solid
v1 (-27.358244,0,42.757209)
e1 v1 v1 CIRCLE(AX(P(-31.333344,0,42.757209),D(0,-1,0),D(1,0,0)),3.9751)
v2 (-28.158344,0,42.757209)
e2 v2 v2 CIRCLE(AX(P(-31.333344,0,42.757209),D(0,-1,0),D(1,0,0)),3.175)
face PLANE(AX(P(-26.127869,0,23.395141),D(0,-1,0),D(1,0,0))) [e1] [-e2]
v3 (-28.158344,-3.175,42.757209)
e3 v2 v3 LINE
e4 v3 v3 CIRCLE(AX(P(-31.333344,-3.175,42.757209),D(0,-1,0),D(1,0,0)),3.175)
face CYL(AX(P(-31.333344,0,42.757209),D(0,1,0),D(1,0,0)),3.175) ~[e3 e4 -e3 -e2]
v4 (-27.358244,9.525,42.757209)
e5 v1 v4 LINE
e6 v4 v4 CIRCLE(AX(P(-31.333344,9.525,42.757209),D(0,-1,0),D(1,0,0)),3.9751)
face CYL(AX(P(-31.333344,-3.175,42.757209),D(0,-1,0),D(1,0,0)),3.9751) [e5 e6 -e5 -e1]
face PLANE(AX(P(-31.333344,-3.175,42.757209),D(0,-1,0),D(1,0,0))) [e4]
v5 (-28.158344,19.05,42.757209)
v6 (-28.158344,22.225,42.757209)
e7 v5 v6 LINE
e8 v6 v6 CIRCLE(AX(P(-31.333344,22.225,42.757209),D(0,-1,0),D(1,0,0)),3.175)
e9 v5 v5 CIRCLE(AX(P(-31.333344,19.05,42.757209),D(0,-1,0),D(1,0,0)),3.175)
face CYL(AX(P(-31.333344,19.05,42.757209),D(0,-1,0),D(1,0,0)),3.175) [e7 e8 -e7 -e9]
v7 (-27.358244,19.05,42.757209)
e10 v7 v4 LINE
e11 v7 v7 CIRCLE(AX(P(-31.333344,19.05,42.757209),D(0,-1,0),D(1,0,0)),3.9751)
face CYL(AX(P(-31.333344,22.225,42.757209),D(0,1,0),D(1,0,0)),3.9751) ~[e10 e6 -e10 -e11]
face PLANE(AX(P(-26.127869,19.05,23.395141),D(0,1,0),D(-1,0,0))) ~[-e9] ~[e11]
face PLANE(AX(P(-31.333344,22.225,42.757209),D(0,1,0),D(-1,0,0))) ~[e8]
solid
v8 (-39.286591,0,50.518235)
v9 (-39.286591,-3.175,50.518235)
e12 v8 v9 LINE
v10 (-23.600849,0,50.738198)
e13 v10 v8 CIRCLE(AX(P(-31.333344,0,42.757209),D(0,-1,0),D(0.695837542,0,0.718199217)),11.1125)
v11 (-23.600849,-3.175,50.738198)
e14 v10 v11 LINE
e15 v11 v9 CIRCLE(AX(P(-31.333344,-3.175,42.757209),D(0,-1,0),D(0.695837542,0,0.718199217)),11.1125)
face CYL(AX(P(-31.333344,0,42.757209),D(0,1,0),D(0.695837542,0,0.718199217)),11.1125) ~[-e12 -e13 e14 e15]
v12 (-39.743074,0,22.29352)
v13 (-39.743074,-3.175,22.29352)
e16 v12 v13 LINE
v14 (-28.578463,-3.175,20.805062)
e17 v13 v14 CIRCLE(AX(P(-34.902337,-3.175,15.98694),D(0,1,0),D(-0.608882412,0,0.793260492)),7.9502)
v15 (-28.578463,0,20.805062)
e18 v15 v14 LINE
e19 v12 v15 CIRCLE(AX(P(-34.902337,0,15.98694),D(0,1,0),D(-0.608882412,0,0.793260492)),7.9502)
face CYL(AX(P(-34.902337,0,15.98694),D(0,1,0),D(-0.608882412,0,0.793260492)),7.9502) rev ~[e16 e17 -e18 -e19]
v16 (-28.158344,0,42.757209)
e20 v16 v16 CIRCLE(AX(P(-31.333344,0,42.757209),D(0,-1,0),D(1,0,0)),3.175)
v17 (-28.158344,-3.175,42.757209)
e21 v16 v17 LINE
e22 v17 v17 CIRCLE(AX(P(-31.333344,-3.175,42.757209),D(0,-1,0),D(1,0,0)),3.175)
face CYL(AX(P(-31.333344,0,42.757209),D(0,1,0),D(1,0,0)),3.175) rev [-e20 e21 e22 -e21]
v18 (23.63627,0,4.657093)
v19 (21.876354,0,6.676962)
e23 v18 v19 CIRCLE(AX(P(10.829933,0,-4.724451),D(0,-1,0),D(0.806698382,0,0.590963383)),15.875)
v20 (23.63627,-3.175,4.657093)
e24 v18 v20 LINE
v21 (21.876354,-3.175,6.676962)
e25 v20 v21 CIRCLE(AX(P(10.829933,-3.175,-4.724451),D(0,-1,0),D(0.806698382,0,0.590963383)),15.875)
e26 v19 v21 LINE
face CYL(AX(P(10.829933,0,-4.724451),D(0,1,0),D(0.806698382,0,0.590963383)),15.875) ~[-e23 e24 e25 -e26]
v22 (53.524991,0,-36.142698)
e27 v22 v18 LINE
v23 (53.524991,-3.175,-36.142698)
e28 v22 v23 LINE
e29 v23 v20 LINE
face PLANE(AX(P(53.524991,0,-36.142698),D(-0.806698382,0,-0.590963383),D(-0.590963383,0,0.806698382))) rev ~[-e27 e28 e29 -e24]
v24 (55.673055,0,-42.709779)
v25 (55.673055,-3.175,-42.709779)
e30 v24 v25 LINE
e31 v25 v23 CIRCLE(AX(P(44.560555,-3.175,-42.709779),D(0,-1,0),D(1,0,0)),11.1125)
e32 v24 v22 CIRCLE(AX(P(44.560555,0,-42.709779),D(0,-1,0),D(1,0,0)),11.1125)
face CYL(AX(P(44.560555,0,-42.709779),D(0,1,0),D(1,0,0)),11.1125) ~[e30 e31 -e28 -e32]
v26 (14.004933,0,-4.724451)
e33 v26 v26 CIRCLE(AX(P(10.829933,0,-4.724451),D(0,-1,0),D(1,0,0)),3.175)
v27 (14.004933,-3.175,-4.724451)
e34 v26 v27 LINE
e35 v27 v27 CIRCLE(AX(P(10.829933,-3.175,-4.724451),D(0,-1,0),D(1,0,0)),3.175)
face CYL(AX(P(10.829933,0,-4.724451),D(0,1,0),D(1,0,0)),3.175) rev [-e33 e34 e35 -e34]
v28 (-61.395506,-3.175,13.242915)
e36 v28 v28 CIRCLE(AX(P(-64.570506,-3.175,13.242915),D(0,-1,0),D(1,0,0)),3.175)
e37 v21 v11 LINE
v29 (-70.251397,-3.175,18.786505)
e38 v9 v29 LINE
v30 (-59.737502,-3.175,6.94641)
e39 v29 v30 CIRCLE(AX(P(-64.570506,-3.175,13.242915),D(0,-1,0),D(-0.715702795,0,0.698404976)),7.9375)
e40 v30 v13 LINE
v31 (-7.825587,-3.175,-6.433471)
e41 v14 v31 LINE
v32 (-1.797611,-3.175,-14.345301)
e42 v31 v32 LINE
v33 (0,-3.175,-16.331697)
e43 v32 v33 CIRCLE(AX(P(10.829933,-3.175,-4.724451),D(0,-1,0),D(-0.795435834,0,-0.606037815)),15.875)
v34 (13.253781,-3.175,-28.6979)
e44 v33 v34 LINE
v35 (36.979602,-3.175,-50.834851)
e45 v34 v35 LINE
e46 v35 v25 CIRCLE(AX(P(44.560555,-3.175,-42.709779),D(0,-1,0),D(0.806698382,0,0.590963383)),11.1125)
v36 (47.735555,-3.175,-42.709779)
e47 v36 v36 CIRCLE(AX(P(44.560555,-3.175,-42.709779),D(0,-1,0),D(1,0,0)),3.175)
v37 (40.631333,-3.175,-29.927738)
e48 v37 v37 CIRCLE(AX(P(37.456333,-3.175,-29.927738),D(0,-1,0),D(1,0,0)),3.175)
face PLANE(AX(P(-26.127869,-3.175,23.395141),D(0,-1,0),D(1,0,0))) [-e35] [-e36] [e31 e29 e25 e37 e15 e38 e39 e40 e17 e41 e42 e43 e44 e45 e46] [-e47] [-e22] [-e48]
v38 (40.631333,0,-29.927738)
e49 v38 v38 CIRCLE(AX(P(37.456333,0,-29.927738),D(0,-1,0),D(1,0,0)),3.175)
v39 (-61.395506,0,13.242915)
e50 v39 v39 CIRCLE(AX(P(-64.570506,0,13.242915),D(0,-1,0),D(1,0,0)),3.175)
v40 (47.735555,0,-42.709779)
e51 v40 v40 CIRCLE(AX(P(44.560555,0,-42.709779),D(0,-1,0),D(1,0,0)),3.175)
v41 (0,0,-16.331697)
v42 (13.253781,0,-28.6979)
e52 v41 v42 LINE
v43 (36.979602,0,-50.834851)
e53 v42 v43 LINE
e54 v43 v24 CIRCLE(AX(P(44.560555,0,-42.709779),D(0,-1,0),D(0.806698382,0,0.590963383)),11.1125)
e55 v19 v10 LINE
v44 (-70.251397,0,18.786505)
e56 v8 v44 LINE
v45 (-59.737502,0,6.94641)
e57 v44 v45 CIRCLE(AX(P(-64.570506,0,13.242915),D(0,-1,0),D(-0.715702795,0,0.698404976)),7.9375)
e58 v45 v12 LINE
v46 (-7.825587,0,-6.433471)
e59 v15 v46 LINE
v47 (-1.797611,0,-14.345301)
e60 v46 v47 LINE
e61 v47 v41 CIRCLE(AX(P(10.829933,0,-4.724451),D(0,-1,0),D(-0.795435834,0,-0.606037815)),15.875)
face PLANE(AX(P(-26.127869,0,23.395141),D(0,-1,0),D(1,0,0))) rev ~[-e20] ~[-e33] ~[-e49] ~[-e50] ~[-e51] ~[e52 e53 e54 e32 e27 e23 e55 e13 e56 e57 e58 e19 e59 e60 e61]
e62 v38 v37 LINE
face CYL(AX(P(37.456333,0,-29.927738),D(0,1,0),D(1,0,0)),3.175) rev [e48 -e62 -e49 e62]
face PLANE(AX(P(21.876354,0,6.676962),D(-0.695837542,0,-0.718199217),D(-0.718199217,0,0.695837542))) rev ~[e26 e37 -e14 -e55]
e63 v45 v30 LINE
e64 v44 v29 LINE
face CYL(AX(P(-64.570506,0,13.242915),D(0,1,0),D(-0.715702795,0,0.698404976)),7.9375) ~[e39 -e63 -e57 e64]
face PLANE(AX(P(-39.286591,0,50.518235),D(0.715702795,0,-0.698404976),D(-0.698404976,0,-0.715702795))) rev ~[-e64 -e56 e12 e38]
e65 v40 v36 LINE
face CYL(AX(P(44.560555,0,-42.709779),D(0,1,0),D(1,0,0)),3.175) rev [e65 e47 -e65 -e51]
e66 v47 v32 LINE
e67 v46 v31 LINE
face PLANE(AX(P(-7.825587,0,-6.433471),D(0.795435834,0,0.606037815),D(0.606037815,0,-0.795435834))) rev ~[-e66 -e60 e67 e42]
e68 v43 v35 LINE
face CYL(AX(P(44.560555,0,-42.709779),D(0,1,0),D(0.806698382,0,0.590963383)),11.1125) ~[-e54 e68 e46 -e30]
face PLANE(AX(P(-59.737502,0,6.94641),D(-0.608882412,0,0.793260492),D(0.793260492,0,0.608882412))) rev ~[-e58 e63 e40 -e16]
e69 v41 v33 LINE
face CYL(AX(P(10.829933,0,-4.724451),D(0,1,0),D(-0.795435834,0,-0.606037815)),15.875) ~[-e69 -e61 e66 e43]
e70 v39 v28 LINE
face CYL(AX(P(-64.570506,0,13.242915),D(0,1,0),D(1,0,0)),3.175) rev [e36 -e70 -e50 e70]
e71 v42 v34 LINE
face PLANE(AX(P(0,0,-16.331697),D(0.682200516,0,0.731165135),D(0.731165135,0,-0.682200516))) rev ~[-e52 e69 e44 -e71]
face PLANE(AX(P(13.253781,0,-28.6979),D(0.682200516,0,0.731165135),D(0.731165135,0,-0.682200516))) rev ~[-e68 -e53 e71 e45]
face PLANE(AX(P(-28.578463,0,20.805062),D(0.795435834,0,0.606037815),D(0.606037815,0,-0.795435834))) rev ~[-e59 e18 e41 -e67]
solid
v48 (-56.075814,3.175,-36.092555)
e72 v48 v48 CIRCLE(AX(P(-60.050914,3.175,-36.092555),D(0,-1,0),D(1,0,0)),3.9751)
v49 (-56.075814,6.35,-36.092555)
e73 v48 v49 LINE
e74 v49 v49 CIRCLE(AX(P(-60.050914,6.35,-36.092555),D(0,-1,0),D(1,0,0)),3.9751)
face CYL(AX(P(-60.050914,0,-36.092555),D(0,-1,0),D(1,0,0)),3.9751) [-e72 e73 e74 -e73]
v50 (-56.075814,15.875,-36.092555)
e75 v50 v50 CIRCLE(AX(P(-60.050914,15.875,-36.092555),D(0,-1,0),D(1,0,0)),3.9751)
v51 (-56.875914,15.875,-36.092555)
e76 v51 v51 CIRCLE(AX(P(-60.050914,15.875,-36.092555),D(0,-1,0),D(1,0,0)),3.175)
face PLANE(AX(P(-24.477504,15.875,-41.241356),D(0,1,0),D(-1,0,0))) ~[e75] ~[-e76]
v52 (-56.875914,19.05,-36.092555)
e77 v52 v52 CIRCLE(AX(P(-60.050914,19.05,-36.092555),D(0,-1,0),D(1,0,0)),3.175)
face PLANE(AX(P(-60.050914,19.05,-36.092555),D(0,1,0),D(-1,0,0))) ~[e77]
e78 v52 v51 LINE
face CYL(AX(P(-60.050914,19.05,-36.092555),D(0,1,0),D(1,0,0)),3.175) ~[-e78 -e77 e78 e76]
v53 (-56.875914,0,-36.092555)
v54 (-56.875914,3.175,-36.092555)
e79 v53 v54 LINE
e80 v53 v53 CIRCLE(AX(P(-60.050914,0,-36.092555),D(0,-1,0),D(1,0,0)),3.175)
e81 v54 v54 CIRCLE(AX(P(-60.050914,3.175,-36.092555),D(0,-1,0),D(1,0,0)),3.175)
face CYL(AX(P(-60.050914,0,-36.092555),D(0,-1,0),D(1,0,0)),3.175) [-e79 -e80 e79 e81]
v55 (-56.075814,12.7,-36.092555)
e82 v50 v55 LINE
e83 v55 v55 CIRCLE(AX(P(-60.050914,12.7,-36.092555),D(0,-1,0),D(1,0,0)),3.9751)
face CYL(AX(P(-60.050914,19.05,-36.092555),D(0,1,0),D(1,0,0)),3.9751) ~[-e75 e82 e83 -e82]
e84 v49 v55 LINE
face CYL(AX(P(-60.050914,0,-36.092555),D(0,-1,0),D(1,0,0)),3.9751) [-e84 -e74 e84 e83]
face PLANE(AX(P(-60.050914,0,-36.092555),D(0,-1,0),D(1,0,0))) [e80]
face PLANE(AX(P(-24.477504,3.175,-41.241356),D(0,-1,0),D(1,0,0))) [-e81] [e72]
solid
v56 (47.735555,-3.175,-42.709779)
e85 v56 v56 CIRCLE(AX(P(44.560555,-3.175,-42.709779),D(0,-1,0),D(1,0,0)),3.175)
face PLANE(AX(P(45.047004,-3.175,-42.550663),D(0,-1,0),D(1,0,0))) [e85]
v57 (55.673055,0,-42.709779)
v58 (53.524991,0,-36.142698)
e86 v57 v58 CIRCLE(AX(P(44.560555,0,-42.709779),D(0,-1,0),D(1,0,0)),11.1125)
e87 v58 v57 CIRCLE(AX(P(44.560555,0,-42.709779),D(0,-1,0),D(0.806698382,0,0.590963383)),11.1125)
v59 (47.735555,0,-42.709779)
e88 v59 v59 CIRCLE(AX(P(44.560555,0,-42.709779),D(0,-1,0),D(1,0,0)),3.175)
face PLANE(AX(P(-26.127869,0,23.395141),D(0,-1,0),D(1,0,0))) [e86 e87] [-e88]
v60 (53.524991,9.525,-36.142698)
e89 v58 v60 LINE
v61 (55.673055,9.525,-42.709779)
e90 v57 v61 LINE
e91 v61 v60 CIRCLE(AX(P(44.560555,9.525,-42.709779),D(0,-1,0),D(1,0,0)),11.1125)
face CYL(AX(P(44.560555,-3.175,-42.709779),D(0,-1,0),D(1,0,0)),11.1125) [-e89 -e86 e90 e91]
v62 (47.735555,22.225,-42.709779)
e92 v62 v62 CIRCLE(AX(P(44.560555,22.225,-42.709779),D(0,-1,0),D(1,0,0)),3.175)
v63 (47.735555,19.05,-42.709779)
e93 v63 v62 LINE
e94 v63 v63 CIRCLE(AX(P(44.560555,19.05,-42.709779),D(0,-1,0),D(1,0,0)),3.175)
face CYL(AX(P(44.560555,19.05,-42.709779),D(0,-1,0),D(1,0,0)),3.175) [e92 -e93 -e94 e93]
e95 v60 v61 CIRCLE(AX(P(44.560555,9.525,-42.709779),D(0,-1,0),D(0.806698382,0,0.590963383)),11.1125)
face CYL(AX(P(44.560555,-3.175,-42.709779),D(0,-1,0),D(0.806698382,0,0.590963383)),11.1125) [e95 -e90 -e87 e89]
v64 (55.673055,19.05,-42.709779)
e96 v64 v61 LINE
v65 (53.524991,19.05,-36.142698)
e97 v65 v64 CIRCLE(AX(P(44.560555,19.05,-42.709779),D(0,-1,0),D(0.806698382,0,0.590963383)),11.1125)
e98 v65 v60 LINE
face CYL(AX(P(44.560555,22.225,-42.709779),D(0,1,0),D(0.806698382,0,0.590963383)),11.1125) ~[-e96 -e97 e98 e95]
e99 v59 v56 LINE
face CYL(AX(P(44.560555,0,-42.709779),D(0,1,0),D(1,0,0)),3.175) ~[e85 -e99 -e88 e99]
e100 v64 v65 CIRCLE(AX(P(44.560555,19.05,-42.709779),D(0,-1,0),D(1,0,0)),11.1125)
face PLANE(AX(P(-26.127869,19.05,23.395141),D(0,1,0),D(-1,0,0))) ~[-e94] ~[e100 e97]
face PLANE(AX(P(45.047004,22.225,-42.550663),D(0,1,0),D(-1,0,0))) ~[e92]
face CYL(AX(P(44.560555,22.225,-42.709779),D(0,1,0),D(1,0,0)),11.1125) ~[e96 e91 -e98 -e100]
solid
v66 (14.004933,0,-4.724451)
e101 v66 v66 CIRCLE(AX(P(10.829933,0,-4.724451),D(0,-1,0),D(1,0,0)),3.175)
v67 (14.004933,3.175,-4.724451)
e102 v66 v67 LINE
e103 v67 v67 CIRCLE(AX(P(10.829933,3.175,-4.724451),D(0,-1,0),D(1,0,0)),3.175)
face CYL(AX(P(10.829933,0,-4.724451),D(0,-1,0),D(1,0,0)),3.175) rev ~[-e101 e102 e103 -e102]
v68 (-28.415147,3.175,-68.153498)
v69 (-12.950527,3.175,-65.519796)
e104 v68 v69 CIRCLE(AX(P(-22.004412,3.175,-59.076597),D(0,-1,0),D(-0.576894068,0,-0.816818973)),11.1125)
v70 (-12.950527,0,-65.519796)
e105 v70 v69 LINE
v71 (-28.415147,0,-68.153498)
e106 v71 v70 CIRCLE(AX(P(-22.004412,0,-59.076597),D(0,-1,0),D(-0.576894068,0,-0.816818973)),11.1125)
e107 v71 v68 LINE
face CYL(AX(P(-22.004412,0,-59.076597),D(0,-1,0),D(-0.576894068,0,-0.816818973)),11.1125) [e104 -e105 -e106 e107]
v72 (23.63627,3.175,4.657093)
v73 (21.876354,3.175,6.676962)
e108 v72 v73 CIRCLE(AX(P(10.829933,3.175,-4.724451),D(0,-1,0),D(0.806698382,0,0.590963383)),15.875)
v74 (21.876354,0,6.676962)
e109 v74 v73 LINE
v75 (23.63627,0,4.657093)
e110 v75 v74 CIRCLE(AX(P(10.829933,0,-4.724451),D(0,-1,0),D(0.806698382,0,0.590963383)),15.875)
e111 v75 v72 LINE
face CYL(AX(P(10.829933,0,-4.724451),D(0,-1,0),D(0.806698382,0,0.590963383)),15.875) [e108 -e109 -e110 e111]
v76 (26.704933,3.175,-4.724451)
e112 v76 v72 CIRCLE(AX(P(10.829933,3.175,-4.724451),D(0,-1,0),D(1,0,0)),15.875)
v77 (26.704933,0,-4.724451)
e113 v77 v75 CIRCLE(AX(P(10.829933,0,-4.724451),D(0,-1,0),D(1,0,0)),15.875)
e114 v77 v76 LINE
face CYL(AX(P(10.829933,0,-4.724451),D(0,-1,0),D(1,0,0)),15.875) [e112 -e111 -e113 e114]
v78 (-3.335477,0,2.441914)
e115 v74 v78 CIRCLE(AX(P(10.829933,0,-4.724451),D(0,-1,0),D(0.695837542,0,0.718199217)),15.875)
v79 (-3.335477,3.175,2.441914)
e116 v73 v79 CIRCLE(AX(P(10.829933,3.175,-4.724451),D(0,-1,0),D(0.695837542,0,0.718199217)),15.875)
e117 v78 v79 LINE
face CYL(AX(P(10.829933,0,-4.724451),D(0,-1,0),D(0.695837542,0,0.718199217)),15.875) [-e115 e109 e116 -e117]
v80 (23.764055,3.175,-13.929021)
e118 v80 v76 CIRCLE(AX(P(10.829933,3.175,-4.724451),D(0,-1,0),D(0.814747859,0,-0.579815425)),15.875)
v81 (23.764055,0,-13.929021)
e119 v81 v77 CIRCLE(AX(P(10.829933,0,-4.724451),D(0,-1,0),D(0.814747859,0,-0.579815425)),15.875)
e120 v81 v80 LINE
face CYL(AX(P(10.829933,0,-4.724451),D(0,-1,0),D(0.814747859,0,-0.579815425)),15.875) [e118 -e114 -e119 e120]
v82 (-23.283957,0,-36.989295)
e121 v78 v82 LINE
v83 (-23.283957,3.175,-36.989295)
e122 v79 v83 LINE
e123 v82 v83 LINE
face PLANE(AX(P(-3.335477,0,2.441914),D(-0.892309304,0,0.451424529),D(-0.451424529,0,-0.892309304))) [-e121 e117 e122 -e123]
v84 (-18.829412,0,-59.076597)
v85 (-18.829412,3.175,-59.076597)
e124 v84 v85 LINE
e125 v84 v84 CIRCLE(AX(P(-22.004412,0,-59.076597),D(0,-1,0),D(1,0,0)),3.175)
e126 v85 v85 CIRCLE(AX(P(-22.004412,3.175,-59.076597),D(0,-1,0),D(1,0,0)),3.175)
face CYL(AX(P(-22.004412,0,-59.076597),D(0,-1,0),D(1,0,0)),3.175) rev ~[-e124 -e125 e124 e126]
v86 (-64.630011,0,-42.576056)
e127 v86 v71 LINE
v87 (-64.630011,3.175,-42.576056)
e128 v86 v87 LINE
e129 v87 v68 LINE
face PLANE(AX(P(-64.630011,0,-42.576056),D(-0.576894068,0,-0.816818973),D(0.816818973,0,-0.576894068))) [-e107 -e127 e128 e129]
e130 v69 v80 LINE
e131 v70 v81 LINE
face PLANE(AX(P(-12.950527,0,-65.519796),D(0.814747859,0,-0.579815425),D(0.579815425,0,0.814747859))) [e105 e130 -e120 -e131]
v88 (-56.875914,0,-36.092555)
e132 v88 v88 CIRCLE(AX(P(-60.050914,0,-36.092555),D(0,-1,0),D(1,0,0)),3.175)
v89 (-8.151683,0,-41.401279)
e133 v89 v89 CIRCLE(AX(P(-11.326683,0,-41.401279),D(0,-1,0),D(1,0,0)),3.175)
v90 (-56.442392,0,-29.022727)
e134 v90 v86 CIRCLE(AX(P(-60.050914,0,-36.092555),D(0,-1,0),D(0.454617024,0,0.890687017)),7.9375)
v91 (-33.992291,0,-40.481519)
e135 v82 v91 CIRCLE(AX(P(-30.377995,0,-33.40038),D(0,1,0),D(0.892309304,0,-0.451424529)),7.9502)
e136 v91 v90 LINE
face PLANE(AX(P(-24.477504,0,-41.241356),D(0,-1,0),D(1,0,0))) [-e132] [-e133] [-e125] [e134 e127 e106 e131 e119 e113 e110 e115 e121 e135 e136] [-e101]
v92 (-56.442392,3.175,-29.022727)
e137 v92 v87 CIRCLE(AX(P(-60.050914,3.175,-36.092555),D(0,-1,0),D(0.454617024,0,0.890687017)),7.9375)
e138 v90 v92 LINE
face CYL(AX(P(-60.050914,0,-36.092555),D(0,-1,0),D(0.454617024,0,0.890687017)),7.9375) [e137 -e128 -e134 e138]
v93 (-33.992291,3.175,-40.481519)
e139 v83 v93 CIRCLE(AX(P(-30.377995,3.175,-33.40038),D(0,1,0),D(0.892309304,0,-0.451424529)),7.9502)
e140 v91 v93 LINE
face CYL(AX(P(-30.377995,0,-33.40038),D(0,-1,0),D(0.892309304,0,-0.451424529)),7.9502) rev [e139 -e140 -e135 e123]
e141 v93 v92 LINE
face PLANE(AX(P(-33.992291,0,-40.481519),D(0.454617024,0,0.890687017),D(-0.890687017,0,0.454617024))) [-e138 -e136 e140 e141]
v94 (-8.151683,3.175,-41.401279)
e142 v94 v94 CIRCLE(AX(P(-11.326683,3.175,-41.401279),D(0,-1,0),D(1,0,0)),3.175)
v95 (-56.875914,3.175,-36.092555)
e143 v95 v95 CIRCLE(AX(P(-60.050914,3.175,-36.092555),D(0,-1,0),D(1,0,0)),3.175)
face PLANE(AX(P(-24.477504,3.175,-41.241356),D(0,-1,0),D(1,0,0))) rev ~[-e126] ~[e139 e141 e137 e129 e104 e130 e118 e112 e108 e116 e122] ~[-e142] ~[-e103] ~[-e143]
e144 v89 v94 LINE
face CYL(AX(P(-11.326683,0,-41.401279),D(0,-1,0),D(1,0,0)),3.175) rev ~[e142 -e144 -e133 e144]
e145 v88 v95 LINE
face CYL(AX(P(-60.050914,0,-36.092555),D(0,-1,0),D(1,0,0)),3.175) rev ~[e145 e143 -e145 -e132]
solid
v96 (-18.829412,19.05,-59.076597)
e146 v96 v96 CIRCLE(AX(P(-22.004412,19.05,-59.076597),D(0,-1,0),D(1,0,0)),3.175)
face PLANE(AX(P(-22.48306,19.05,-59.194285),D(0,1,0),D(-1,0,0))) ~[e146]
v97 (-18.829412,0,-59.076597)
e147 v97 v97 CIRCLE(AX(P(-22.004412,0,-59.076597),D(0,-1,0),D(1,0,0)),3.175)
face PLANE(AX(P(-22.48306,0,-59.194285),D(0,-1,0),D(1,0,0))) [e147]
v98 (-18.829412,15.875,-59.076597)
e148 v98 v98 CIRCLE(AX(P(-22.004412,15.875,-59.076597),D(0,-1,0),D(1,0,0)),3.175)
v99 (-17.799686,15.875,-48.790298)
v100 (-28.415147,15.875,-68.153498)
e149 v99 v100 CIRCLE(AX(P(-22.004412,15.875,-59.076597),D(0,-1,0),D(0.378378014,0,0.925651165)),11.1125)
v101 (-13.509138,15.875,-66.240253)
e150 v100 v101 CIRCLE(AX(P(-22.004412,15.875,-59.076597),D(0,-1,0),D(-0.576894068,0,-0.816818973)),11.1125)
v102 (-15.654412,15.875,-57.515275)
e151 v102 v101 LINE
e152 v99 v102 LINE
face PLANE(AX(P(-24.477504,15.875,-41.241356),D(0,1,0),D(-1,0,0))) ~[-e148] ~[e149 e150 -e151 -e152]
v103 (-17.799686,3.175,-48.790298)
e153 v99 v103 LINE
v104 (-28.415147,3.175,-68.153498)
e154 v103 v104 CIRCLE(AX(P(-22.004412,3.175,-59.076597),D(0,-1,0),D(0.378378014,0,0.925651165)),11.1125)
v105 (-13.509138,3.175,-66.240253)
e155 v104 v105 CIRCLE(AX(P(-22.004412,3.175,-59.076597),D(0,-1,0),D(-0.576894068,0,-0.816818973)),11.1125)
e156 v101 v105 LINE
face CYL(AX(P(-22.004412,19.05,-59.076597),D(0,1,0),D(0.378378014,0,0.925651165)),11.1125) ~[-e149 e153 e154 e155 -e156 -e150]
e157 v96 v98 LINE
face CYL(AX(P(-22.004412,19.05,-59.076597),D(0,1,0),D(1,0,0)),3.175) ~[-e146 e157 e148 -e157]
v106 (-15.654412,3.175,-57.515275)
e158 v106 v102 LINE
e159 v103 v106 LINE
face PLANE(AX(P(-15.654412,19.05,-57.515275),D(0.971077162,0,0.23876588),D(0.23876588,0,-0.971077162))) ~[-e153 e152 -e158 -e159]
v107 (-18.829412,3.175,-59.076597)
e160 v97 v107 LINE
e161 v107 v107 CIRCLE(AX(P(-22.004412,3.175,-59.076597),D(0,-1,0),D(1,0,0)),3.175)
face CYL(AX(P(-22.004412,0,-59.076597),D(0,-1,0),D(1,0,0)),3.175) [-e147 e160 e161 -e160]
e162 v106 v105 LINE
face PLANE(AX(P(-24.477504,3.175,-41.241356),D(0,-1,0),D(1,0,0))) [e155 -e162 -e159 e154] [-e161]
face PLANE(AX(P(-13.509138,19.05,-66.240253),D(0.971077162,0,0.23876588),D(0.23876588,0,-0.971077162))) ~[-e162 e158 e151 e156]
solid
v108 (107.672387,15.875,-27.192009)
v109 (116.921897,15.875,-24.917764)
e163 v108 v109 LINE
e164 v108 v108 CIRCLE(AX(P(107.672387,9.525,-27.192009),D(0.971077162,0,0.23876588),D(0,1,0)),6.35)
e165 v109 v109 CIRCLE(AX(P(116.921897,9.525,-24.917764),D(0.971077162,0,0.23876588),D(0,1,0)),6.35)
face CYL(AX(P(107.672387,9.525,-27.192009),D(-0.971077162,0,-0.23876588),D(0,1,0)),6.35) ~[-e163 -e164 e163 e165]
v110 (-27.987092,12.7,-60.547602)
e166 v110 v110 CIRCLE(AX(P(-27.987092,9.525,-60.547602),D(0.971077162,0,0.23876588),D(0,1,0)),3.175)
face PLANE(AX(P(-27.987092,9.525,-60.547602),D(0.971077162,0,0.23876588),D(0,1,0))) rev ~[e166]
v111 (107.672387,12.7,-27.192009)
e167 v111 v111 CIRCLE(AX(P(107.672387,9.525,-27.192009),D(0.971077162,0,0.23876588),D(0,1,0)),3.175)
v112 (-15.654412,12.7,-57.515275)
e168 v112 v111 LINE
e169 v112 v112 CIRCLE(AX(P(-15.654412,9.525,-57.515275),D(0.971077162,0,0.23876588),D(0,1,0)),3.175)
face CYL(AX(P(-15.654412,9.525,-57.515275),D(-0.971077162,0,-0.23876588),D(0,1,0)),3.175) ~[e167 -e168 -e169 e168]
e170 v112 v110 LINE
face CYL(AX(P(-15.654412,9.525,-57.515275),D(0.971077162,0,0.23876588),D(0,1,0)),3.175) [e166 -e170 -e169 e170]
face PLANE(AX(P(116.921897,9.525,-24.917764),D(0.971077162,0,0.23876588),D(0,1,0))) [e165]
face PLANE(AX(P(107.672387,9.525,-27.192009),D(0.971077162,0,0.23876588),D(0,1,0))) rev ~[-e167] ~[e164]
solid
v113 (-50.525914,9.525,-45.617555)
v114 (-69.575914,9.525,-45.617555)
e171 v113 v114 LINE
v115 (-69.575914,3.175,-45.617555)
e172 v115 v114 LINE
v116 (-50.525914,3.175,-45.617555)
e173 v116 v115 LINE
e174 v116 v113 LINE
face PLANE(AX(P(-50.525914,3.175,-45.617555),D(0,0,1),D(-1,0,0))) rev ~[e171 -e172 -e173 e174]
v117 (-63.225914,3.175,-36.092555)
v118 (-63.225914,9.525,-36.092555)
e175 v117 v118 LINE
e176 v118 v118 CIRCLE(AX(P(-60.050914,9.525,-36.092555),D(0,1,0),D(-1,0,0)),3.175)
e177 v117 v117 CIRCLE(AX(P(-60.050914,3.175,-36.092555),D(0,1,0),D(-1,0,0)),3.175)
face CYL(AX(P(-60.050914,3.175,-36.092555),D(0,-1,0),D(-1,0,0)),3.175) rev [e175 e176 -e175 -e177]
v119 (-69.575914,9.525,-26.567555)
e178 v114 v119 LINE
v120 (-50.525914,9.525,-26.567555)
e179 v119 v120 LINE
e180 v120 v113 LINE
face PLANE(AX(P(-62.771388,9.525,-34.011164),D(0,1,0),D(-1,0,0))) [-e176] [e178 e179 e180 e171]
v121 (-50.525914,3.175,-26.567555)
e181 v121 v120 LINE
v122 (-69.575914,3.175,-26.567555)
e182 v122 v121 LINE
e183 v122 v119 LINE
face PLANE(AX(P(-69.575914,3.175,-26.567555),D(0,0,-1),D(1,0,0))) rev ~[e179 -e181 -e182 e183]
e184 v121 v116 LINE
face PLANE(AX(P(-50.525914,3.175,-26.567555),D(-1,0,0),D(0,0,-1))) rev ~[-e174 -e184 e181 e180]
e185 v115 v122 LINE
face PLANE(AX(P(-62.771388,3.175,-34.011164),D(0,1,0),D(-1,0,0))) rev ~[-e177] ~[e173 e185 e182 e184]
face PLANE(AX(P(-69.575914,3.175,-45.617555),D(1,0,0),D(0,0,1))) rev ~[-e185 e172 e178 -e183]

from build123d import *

# Parameters (mm, degrees)
F0_R      = 3.175
F0_R_2    = 3.9751
F1_DEPTH  = 3.175
F2_DEPTH  = 3.175
F3_R      = 3.175
F6_DEPTH  = 12.7
F3_R_2    = 3.9751
F4_R      = 3.9751
F4_R_2    = 3.175
F11_R     = 3.175
F12_DEPTH = 12.7
F13_DEPTH = 127
F14_R     = 6.35
F14_R_2   = 3.175
F15_DEPTH = 9.525
F16_R     = 3.175
F17_DEPTH = 6.35


with BuildPart() as f1:
    # F0 (on Front) → F1 (new body)
    with BuildSketch(Plane.XZ):
        with BuildLine():
            Line((-1.7976106712, -14.3453010855), (-7.8255865168, -6.4334713683))
            Line((-7.8255865168, -6.4334713683), (-23.2839574438, -36.9892948112))
            ThreePointArc((-23.2839574438, -36.9892948112), (-27.9130287782, -40.9587935194), (-33.99229114, -40.481519439))
            Line((-33.99229114, -40.481519439), (-56.4423916697, -29.0227267269))
            ThreePointArc((-56.4423916697, -29.0227267269), (-53.2816250221, -31.9476026962), (-52.1134142985, -36.0925549206))
            ThreePointArc((-52.1134142985, -36.0925549206), (-56.4000701161, -43.1406215353), (-64.6300109614, -42.5760555184))
            Line((-64.6300109614, -42.5760555184), (-28.4151474925, -68.1534975119))
            ThreePointArc((-28.4151474925, -68.1534975119), (-27.1155940199, -49.2093034143), (-10.8919121645, -59.0765966749))
            ThreePointArc((-10.8919121645, -59.0765966749), (-11.4190694743, -62.458633987), (-12.9505265861, -65.5197955841))
            Line((-12.9505265861, -65.5197955841), (13.2537806818, -28.697899658))
            Line((13.2537806818, -28.697899658), (0, -16.3316972949))
            ThreePointArc((0, -16.3316972949), (-0.9407825859, -15.3764869555), (-1.7976106712, -14.3453010855))
        make_face()
        with Locations((-11.3266830524, -41.4012788264)):
            Circle(F0_R, mode=Mode.SUBTRACT)
        with BuildLine():
            Line((-3.3354770071, 2.4419136296), (-7.8255865168, -6.4334713683))
            Line((-7.8255865168, -6.4334713683), (-1.7976106712, -14.3453010855))
            ThreePointArc((-1.7976106712, -14.3453010855), (-4.9788694599, -6.172685383), (-3.3354770071, 2.4419136296))
        make_face()
        with BuildLine():
            ThreePointArc((23.6362700176, 4.6570929355), (22.798996702, 5.7042185542), (21.876354173, 6.676961804))
            ThreePointArc((21.876354173, 6.676961804), (8.2001172895, 10.9312093345), (-3.3354770071, 2.4419136296))
            ThreePointArc((-3.3354770071, 2.4419136296), (-4.9788694599, -6.172685383), (-1.7976106712, -14.3453010855))
            ThreePointArc((-1.7976106712, -14.3453010855), (-0.9407825859, -15.3764869555), (0, -16.3316972949))
            ThreePointArc((0, -16.3316972949), (12.4268416726, -20.5189279155), (23.7640554537, -13.9290206394))
            ThreePointArc((23.7640554537, -13.9290206394), (25.9518513278, -9.5559326435), (26.7049331988, -4.7244507692))
            ThreePointArc((26.7049331988, -4.7244507692), (25.9182767461, 0.2108824517), (23.6362700176, 4.6570929355))
        make_face()
        with Locations((10.8299331988, -4.7244507692)):
            Circle(F0_R_2, mode=Mode.SUBTRACT)
        with BuildLine():
            ThreePointArc((23.7640554537, -13.9290206394), (12.4268416726, -20.5189279155), (0, -16.3316972949))
            Line((0, -16.3316972949), (13.2537806818, -28.697899658))
            Line((13.2537806818, -28.697899658), (23.7640554537, -13.9290206394))
        make_face()
        with BuildLine():
            ThreePointArc((-52.1134142985, -36.0925549206), (-53.2816250221, -31.9476026962), (-56.4423916697, -29.0227267269))
            ThreePointArc((-56.4423916697, -29.0227267269), (-66.8449325368, -31.9882617501), (-64.6300109614, -42.5760555184))
            ThreePointArc((-64.6300109614, -42.5760555184), (-56.4000701161, -43.1406215353), (-52.1134142985, -36.0925549206))
        make_face()
        with Locations((-60.0509142985, -36.0925549206)):
            Circle(F0_R, mode=Mode.SUBTRACT)
        with BuildLine():
            ThreePointArc((-28.4151474925, -68.1534975119), (-20.1387601947, -70.0313672785), (-12.9505265861, -65.5197955841))
            ThreePointArc((-12.9505265861, -65.5197955841), (-11.4190694743, -62.458633987), (-10.8919121645, -59.0765966749))
            ThreePointArc((-10.8919121645, -59.0765966749), (-27.1155940199, -49.2093034143), (-28.4151474925, -68.1534975119))
        make_face()
        with Locations((-22.0044121645, -59.0765966749)):
            Circle(F0_R, mode=Mode.SUBTRACT)
        with Locations((10.8299331988, -4.7244507692)):
            Circle(F0_R_2)
        with Locations((10.8299331988, -4.7244507692)):
            Circle(F0_R, mode=Mode.SUBTRACT)
    extrude(amount=-F1_DEPTH)


with BuildPart() as f2:
    # F0 (on Front) → F2 (new body)
    with BuildSketch(Plane.XZ):
        with BuildLine():
            ThreePointArc((-70.251397086, 18.7865048472), (-61.5778622997, 20.594649096), (-56.6330061539, 13.2429153541))
            ThreePointArc((-56.6330061539, 13.2429153541), (-57.4513110928, 9.7327917193), (-59.7375020108, 6.9464101963))
            Line((-59.7375020108, 6.9464101963), (-39.743073588, 22.2935199))
            ThreePointArc((-39.743073588, 22.2935199), (-33.8517175555, 23.8674149125), (-28.5784626681, 20.8050621724))
            Line((-28.5784626681, 20.8050621724), (-7.8255865168, -6.4334713683))
            Line((-7.8255865168, -6.4334713683), (-3.3354770071, 2.4419136296))
            ThreePointArc((-3.3354770071, 2.4419136296), (8.2001172895, 10.9312093345), (21.876354173, 6.676961804))
            Line((21.876354173, 6.676961804), (-23.6008493451, 50.7381982134))
            ThreePointArc((-23.6008493451, 50.7381982134), (-21.1006756701, 47.0908169797), (-20.220844027, 42.7572094122))
            ThreePointArc((-20.220844027, 42.7572094122), (-35.5230454229, 32.4647821735), (-39.2865913319, 50.5182347025))
            Line((-39.2865913319, 50.5182347025), (-70.251397086, 18.7865048472))
        make_face()
        with BuildLine():
            ThreePointArc((-59.7375020108, 6.9464101963), (-57.4513110928, 9.7327917193), (-56.6330061539, 13.2429153541))
            ThreePointArc((-56.6330061539, 13.2429153541), (-61.5778622997, 20.594649096), (-70.251397086, 18.7865048472))
            ThreePointArc((-70.251397086, 18.7865048472), (-70.5057136766, 7.9725057009), (-59.7375020108, 6.9464101963))
        make_face()
        with Locations((-64.5705061539, 13.2429153541)):
            Circle(F0_R, mode=Mode.SUBTRACT)
        with BuildLine():
            ThreePointArc((-23.6008493451, 50.7381982134), (-31.4891609602, 53.8686169438), (-39.2865913319, 50.5182347025))
            ThreePointArc((-39.2865913319, 50.5182347025), (-35.5230454229, 32.4647821735), (-20.220844027, 42.7572094122))
            ThreePointArc((-20.220844027, 42.7572094122), (-21.1006756701, 47.0908169797), (-23.6008493451, 50.7381982134))
        make_face()
        with Locations((-31.333344027, 42.7572094122)):
            Circle(F0_R, mode=Mode.SUBTRACT)
        with BuildLine():
            ThreePointArc((23.6362700176, 4.6570929355), (22.798996702, 5.7042185542), (21.876354173, 6.676961804))
            ThreePointArc((21.876354173, 6.676961804), (8.2001172895, 10.9312093345), (-3.3354770071, 2.4419136296))
            ThreePointArc((-3.3354770071, 2.4419136296), (-4.9788694599, -6.172685383), (-1.7976106712, -14.3453010855))
            ThreePointArc((-1.7976106712, -14.3453010855), (-0.9407825859, -15.3764869555), (0, -16.3316972949))
            ThreePointArc((0, -16.3316972949), (12.4268416726, -20.5189279155), (23.7640554537, -13.9290206394))
            ThreePointArc((23.7640554537, -13.9290206394), (25.9518513278, -9.5559326435), (26.7049331988, -4.7244507692))
            ThreePointArc((26.7049331988, -4.7244507692), (25.9182767461, 0.2108824517), (23.6362700176, 4.6570929355))
        make_face()
        with Locations((10.8299331988, -4.7244507692)):
            Circle(F0_R_2, mode=Mode.SUBTRACT)
        with BuildLine():
            Line((-3.3354770071, 2.4419136296), (-7.8255865168, -6.4334713683))
            Line((-7.8255865168, -6.4334713683), (-1.7976106712, -14.3453010855))
            ThreePointArc((-1.7976106712, -14.3453010855), (-4.9788694599, -6.172685383), (-3.3354770071, 2.4419136296))
        make_face()
        with BuildLine():
            ThreePointArc((23.7640554537, -13.9290206394), (12.4268416726, -20.5189279155), (0, -16.3316972949))
            Line((0, -16.3316972949), (13.2537806818, -28.697899658))
            Line((13.2537806818, -28.697899658), (23.7640554537, -13.9290206394))
        make_face()
        with Locations((10.8299331988, -4.7244507692)):
            Circle(F0_R_2)
        with Locations((10.8299331988, -4.7244507692)):
            Circle(F0_R, mode=Mode.SUBTRACT)
        with BuildLine():
            Line((53.5249907527, -36.142698321), (23.6362700176, 4.6570929355))
            ThreePointArc((23.6362700176, 4.6570929355), (25.9182767461, 0.2108824517), (26.7049331988, -4.7244507692))
            ThreePointArc((26.7049331988, -4.7244507692), (25.9518513278, -9.5559326435), (23.7640554537, -13.9290206394))
            Line((23.7640554537, -13.9290206394), (13.2537806818, -28.697899658))
            Line((13.2537806818, -28.697899658), (36.9796017403, -50.8348514823))
            ThreePointArc((36.9796017403, -50.8348514823), (37.181981465, -34.4004883825), (53.5249907527, -36.142698321))
        make_face()
        with Locations((37.4563332682, -29.9277378442)):
            Circle(F0_R, mode=Mode.SUBTRACT)
        with BuildLine():
            ThreePointArc((55.6730549795, -42.7097789143), (55.1223954626, -39.2550456597), (53.5249907527, -36.142698321))
            ThreePointArc((53.5249907527, -36.142698321), (37.181981465, -34.4004883825), (36.9796017403, -50.8348514823))
            ThreePointArc((36.9796017403, -50.8348514823), (48.99024534, -52.9012213814), (55.6730549795, -42.7097789143))
        make_face()
        with Locations((44.5605549795, -42.7097789143)):
            Circle(F0_R, mode=Mode.SUBTRACT)
    extrude(amount=F2_DEPTH)


with BuildPart() as f6:
    # F3 (on face) → F6 (new body, through all)
    with BuildSketch(Plane.XZ.offset(3.175)):
        with BuildLine():
            ThreePointArc((36.9796017403, -50.8348514823), (48.99024534, -52.9012213814), (55.6730549795, -42.7097789143))
            ThreePointArc((55.6730549795, -42.7097789143), (55.1223954626, -39.2550456597), (53.5249907527, -36.142698321))
            ThreePointArc((53.5249907527, -36.142698321), (37.181981465, -34.4004883825), (36.9796017403, -50.8348514823))
        make_face()
        with Locations((44.5605549795, -42.7097789143)):
            Circle(F3_R, mode=Mode.SUBTRACT)
        with Locations((44.5605549795, -42.7097789143)):
            Circle(F3_R)
    extrude(amount=-F6_DEPTH)

    # F7: cut F2
    add(f2.part, mode=Mode.SUBTRACT)


with BuildPart() as f6b:
    # F3 (on face) → F6, piece 2 (new body, through all)
    with BuildSketch(Plane.XZ.offset(3.175)):
        with Locations((-31.333344027, 42.7572094122)):
            Circle(F3_R_2)
        with Locations((-31.333344027, 42.7572094122)):
            Circle(F3_R, mode=Mode.SUBTRACT)
        with Locations((-31.333344027, 42.7572094122)):
            Circle(F3_R)
    extrude(amount=-F6_DEPTH)

    # F7: cut F2
    add(f2.part, mode=Mode.SUBTRACT)


with BuildPart() as f6c:
    # F4 (on Front) → F6, piece 3 (new body, through all)
    with BuildSketch(Plane.XZ):
        with Locations((-60.0509142985, -36.0925549206)):
            Circle(F4_R)
        with Locations((-60.0509142985, -36.0925549206)):
            Circle(F4_R_2, mode=Mode.SUBTRACT)
        with Locations((-60.0509142985, -36.0925549206)):
            Circle(F4_R_2)
    extrude(amount=-F6_DEPTH)

    # F8: cut F1
    add(f1.part, mode=Mode.SUBTRACT)


with BuildPart() as f6d:
    # F4 (on Front) → F6, piece 4 (new body, through all)
    with BuildSketch(Plane.XZ):
        with BuildLine():
            Line((-15.6544121645, -57.5152754989), (-17.7996864895, -48.7902981061))
            ThreePointArc((-17.7996864895, -48.7902981061), (-32.7955071278, -61.729882514), (-13.5091378396, -66.2402528918))
            Line((-13.5091378396, -66.2402528918), (-15.6544121645, -57.5152754989))
        make_face()
        with Locations((-22.0044121645, -59.0765966749)):
            Circle(F4_R_2, mode=Mode.SUBTRACT)
        with Locations((-22.0044121645, -59.0765966749)):
            Circle(F4_R_2)
    extrude(amount=-F6_DEPTH)

    # F8: cut F1
    add(f1.part, mode=Mode.SUBTRACT)


with BuildPart() as f9_1:
    # F9: instance of F6b
    add(f6b.part.mirror(Plane.XZ.offset(-9.525)))


with BuildPart() as f9_2:
    # F9: instance of F6
    add(f6.part.mirror(Plane.XZ.offset(-9.525)))


with BuildPart() as f9_3:
    # F9: instance of F6d
    add(f6d.part.mirror(Plane.XZ.offset(-9.525)))


with BuildPart() as f9_4:
    # F9: instance of F6c
    add(f6c.part.mirror(Plane.XZ.offset(-9.525)))


with BuildPart() as f6b_1:
    add(f6b.part)

    # F10: union F9_1, F6, F6c, F6d, F9_2, F9_4, F9_3
    add(f9_1.part)
    add(f6.part)
    add(f6c.part)
    add(f6d.part)
    add(f9_2.part)
    add(f9_4.part)
    add(f9_3.part)


with BuildPart() as f12:
    # F11 (on face) → F12 (new body)
    with BuildSketch(Plane(origin=(-28.0974646283, 0, -6.9085301599), x_dir=(0, 1, 0), z_dir=(0.971077162, 0, 0.2387658798))):
        with Locations((9.525, -52.114031013)):
            Circle(F11_R)
    extrude(amount=-F12_DEPTH)

    # F13 (add): a face of the model
    f13_faces = [f12.faces().sort_by_distance(p)[0] for p in [
        (-15.6544121645, 9.525, -57.5152754989),
    ]]
    extrude(f13_faces, amount=F13_DEPTH)

    # F14 (on face) → F15 (join)
    with BuildSketch(Plane(origin=(95.2293349518, 0, 23.4147365724), x_dir=(0, 1, 0), z_dir=(0.971077162, 0, 0.2387658798))):
        with Locations((9.525, -52.114031013)):
            Circle(F14_R)
        with Locations((9.525, -52.114031013)):
            Circle(F14_R_2, mode=Mode.SUBTRACT)
        with Locations((9.525, -52.114031013)):
            Circle(F14_R_2)
    extrude(amount=F15_DEPTH)


with BuildPart() as f17:
    # F16 (on face) → F17 (new body, through all)
    with BuildSketch(Plane(origin=(0, 3.175, 0), x_dir=(-1, 0, 0), z_dir=(0, 1, 0))):
        with BuildLine():
            Line((69.5759142985, -45.6175549206), (69.5759142985, -26.5675549206))
            Line((69.5759142985, -26.5675549206), (50.5259142985, -26.5675549206))
            Line((50.5259142985, -26.5675549206), (50.5259142985, -32.0425656667))
            Line((50.5259142985, -32.0425656667), (56.4423916697, -29.0227267269))
            ThreePointArc((56.4423916697, -29.0227267269), (66.8449325368, -31.9882617501), (64.6300109614, -42.5760555184))
            Line((64.6300109614, -42.5760555184), (60.3235800987, -45.6175549206))
            Line((60.3235800987, -45.6175549206), (69.5759142985, -45.6175549206))
        make_face()
        with BuildLine():
            Line((56.4423916697, -29.0227267269), (50.5259142985, -32.0425656667))
            Line((50.5259142985, -32.0425656667), (50.5259142985, -45.6175549206))
            Line((50.5259142985, -45.6175549206), (60.3235800987, -45.6175549206))
            Line((60.3235800987, -45.6175549206), (64.6300109614, -42.5760555184))
            ThreePointArc((64.6300109614, -42.5760555184), (66.8449325368, -31.9882617501), (56.4423916697, -29.0227267269))
        make_face()
        with Locations((60.0509142985, -36.0925549206)):
            Circle(F16_R, mode=Mode.SUBTRACT)
    extrude(amount=F17_DEPTH)


solid = Compound([f1.part, f2.part, f6b_1.part, f12.part, f17.part])
